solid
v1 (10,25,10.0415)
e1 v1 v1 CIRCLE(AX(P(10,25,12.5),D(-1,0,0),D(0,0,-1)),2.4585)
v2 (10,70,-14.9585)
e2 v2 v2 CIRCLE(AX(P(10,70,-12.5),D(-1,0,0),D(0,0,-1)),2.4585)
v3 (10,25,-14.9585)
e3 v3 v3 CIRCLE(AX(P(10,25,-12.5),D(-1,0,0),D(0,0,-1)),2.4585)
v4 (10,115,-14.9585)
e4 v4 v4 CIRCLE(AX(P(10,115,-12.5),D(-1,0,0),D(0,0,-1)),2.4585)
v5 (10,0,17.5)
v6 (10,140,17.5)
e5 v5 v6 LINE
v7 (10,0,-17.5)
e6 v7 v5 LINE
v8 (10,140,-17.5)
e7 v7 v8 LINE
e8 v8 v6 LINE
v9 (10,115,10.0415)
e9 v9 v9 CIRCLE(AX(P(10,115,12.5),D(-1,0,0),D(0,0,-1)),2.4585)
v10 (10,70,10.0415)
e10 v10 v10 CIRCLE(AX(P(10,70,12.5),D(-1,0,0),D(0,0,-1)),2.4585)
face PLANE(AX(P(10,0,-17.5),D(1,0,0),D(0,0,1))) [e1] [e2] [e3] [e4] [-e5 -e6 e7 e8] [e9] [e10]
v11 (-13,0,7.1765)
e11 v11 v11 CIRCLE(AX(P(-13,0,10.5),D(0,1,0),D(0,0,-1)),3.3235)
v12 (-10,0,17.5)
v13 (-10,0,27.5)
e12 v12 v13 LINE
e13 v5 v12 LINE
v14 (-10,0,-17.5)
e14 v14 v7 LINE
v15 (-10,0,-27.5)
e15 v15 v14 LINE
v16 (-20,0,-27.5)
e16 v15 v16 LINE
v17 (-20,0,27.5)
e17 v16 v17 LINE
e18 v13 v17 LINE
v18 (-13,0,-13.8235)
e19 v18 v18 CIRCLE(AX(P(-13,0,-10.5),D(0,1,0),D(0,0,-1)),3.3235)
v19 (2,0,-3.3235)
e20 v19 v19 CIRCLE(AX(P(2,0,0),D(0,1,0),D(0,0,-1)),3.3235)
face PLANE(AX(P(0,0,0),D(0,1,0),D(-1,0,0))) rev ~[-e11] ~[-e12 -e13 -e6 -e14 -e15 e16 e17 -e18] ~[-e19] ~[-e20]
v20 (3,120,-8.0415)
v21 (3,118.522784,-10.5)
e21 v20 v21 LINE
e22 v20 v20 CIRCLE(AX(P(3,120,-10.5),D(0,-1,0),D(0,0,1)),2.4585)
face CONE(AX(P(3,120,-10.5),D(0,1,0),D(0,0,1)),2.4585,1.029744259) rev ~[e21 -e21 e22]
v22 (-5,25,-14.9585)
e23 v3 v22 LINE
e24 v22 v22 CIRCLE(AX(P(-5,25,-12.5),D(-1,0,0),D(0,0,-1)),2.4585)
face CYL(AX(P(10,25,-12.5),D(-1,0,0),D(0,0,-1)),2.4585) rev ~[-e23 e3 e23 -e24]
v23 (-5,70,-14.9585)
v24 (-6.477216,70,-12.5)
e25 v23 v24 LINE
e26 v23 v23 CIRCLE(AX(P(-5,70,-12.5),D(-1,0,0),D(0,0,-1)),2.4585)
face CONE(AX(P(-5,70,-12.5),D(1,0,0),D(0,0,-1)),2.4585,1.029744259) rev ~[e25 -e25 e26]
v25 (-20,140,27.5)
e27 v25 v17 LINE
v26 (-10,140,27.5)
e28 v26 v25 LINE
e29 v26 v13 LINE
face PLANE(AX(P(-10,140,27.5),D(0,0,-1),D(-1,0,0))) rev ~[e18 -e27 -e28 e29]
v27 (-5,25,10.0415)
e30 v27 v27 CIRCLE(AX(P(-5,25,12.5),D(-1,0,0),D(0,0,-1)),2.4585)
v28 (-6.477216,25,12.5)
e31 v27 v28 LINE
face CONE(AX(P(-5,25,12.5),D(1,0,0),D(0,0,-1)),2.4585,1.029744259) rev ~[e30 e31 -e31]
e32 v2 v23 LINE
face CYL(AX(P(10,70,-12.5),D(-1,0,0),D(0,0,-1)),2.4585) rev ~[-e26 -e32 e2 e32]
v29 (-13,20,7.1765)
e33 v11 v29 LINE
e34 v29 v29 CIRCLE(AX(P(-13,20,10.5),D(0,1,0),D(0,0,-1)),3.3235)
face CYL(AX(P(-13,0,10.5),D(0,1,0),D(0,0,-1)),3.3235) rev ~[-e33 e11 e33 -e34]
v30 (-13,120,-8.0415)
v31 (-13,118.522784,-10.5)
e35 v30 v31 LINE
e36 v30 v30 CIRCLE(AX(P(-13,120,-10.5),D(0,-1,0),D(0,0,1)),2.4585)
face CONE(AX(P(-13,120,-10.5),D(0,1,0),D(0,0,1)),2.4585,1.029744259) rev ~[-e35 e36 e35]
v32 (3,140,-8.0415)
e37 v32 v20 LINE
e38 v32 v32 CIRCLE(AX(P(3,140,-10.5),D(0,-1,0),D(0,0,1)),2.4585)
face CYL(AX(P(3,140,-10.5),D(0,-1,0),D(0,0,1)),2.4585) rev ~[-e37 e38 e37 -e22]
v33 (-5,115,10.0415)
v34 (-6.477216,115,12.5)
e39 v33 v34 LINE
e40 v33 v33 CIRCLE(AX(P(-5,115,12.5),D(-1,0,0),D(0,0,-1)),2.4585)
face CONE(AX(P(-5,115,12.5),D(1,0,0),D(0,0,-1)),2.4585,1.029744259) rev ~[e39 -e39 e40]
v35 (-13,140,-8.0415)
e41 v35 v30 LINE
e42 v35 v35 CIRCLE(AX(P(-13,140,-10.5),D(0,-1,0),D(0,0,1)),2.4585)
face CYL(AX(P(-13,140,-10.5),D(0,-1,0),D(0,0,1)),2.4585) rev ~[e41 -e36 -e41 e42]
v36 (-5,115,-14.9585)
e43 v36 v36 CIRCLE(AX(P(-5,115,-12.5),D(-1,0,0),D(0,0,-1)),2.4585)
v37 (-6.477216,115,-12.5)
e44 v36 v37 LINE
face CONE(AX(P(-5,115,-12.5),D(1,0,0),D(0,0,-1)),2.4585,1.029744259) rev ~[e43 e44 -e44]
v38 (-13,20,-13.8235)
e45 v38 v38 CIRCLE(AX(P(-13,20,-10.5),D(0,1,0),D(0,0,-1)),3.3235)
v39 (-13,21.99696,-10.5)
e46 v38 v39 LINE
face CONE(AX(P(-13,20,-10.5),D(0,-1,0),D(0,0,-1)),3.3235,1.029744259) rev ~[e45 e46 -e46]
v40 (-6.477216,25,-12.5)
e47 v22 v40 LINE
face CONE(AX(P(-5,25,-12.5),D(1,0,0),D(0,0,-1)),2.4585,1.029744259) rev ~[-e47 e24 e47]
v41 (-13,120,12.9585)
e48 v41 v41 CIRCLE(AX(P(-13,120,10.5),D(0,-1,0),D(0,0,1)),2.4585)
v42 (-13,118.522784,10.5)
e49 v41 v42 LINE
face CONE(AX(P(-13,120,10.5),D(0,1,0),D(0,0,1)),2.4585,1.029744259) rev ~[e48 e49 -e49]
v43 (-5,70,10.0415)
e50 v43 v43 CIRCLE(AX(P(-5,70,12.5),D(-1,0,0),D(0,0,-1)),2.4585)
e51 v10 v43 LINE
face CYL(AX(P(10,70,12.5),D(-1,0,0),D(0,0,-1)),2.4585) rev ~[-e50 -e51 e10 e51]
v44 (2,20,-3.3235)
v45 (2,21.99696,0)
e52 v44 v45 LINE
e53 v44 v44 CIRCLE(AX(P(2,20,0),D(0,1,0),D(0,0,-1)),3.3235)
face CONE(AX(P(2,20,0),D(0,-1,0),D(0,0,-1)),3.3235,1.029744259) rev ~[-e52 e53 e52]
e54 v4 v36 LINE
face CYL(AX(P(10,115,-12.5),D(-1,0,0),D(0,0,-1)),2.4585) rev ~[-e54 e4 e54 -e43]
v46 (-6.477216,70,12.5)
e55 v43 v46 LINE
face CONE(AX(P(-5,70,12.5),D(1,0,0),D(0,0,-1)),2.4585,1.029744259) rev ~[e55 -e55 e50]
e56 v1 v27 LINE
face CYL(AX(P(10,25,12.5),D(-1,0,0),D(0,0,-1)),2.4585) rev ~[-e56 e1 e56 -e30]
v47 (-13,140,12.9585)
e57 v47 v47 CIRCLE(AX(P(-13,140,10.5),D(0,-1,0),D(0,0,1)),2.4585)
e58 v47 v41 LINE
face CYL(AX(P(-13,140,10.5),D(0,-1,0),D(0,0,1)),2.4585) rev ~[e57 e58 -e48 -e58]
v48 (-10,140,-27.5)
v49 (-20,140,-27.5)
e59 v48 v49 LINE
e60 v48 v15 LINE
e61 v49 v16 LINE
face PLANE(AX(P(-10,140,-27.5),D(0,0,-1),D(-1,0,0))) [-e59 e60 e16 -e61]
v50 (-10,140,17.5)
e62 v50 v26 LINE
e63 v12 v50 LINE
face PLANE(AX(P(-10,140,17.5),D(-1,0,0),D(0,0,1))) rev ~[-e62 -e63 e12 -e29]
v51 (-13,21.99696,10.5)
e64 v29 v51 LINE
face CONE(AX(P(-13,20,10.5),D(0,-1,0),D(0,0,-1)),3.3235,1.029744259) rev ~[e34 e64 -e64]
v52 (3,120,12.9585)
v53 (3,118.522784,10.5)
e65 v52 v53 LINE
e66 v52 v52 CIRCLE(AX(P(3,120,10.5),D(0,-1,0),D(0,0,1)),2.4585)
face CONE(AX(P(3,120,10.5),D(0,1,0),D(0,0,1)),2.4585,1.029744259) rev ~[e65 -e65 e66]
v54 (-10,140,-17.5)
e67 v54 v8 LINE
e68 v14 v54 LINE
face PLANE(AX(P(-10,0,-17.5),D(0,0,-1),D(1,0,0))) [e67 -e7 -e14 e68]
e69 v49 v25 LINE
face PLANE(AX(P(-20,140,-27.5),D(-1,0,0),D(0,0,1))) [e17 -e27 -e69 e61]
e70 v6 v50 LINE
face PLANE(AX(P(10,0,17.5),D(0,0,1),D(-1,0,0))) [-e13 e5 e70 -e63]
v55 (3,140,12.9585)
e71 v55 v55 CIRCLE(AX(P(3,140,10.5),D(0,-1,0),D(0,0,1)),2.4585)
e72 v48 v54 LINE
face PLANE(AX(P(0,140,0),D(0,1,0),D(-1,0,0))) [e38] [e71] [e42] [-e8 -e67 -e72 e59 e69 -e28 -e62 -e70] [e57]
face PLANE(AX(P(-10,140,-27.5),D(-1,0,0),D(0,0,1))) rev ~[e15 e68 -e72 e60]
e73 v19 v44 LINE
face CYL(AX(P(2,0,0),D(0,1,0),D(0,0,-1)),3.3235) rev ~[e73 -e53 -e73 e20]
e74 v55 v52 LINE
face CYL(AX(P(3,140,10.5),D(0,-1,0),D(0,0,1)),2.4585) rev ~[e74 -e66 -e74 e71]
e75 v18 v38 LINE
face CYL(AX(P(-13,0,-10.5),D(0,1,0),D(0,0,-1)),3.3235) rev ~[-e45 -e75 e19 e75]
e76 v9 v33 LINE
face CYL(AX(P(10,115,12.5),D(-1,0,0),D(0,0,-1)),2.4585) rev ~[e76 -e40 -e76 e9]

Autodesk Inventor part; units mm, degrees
ref_plane "YZ Plane" through (0, 0, 0) normal (1, 0, 0) x (0, 1, 0)
ref_plane "XZ Plane" through (0, 0, 0) normal (0, 1, 0) x (-1, 0, 0)
ref_plane "XY Plane" through (0, 0, 0) normal (0, 0, 1) x (1, 0, 0)
sketch "Sketch1" plane through (0, 0, 0) normal (0, 1, 0) x (-1, 0, 0)
  line L0 (-10, 17.5) -> (10, 17.5)
  line L1 (10, 17.5) -> (10, -17.5)
  line L2 (10, -17.5) -> (-10, -17.5)
  line L3 (-10, -17.5) -> (-10, 17.5)
  line L4 (-10, 17.5) -> (10, -17.5) construction
  line L5 (10, 17.5) -> (-10, -17.5) construction
  point P0 (0, 0)
  dimension "d0" = 35
  dimension "d1" = 20
extrude "Extrusion1" add sketch "Sketch1" along normal blind 140
sketch "Sketch2" plane through (0, 140, 0) normal (0, 1, 0) x (1, 0, 0)
  line L0 (-10, 27.5) -> (-10, -27.5)
  line L1 (-10, -27.5) -> (-20, -27.5)
  line L2 (-10, 27.5) -> (-20, 27.5)
  line L3 (-20, 27.5) -> (-20, -27.5)
  line L4 (-10, 17.5) -> (-10, -17.5) projected
  point P0 (0, 0)
  dimension "d4" = 55
  dimension "d5" = 0
  dimension "d6" = 10
  dimension "d7" = 27.5
extrude "Extrusion2" add sketch "Sketch2" against normal blind 140
sketch "Sketch3" plane through (0, 140, 0) normal (0, 1, 0) x (1, 0, 0)
  line L0 (10, -17.5) -> (10, 17.5) projected
  point P0 (0, 0)
  point P1 (3, -10.5)
  dimension "d10" = 7
  dimension "d11" = 10.5
hole "Hole1" at (3, 140, 10.5) direction (0, -1, 0) diameter 4.917 depth 20 tip angle 118 thread size "M6x1" class "6H" standard "ISO Metric profile"
pattern_linear "Rectangular Pattern1" count 2 spacing 16 along (-1, 0, 0) count 2 spacing 21 along (0, 0, -1) of "Hole1"
sketch "Sketch4" plane through (0, 0, 0) normal (0, -1, 0) x (1, 0, 0)
  line L0 (10, 17.5) -> (10, -17.5) projected
  point P0 (0, 0)
  point P1 (-13, -10.5)
  point P2 (-13, 10.5)
  point P3 (2, 0)
  dimension "d25" = 21
  dimension "d27" = 10.5
  dimension "d28" = 23
  dimension "d29" = 23
  dimension "d30" = 8
  dimension "d31" = 15
hole "Hole2" at (-13, 0, -10.5) at (-13, 0, 10.5) at (2, 0, 0) direction (0, 1, 0) diameter 6.647 depth 20 tip angle 118 thread size "M8x1.25" class "6H" standard "ISO Metric profile"
sketch "Sketch5" plane through (10, 0, 17.5) normal (1, 0, 0) x (0, 0, -1)
  line L0 (0, 0) -> (35, 0) projected
  point P0 (17.5, 0)
  point P1 (30, 25)
  point P2 (17.5, 0)
  point P3 (17.5, 0)
  dimension "d39" = 25
  dimension "d40" = 12.5
hole "Hole3" at (10, 25, -12.5) direction (-1, 0, 0) diameter 4.917 depth 15 tip angle 118 thread size "M6x1" class "6H" standard "ISO Metric profile"
pattern_linear "Rectangular Pattern2" count 2 spacing 25 along (0, 0, 1) count 3 spacing 45 along (0, 1, 0) of "Hole3"
properties part number "Fuhrung"
